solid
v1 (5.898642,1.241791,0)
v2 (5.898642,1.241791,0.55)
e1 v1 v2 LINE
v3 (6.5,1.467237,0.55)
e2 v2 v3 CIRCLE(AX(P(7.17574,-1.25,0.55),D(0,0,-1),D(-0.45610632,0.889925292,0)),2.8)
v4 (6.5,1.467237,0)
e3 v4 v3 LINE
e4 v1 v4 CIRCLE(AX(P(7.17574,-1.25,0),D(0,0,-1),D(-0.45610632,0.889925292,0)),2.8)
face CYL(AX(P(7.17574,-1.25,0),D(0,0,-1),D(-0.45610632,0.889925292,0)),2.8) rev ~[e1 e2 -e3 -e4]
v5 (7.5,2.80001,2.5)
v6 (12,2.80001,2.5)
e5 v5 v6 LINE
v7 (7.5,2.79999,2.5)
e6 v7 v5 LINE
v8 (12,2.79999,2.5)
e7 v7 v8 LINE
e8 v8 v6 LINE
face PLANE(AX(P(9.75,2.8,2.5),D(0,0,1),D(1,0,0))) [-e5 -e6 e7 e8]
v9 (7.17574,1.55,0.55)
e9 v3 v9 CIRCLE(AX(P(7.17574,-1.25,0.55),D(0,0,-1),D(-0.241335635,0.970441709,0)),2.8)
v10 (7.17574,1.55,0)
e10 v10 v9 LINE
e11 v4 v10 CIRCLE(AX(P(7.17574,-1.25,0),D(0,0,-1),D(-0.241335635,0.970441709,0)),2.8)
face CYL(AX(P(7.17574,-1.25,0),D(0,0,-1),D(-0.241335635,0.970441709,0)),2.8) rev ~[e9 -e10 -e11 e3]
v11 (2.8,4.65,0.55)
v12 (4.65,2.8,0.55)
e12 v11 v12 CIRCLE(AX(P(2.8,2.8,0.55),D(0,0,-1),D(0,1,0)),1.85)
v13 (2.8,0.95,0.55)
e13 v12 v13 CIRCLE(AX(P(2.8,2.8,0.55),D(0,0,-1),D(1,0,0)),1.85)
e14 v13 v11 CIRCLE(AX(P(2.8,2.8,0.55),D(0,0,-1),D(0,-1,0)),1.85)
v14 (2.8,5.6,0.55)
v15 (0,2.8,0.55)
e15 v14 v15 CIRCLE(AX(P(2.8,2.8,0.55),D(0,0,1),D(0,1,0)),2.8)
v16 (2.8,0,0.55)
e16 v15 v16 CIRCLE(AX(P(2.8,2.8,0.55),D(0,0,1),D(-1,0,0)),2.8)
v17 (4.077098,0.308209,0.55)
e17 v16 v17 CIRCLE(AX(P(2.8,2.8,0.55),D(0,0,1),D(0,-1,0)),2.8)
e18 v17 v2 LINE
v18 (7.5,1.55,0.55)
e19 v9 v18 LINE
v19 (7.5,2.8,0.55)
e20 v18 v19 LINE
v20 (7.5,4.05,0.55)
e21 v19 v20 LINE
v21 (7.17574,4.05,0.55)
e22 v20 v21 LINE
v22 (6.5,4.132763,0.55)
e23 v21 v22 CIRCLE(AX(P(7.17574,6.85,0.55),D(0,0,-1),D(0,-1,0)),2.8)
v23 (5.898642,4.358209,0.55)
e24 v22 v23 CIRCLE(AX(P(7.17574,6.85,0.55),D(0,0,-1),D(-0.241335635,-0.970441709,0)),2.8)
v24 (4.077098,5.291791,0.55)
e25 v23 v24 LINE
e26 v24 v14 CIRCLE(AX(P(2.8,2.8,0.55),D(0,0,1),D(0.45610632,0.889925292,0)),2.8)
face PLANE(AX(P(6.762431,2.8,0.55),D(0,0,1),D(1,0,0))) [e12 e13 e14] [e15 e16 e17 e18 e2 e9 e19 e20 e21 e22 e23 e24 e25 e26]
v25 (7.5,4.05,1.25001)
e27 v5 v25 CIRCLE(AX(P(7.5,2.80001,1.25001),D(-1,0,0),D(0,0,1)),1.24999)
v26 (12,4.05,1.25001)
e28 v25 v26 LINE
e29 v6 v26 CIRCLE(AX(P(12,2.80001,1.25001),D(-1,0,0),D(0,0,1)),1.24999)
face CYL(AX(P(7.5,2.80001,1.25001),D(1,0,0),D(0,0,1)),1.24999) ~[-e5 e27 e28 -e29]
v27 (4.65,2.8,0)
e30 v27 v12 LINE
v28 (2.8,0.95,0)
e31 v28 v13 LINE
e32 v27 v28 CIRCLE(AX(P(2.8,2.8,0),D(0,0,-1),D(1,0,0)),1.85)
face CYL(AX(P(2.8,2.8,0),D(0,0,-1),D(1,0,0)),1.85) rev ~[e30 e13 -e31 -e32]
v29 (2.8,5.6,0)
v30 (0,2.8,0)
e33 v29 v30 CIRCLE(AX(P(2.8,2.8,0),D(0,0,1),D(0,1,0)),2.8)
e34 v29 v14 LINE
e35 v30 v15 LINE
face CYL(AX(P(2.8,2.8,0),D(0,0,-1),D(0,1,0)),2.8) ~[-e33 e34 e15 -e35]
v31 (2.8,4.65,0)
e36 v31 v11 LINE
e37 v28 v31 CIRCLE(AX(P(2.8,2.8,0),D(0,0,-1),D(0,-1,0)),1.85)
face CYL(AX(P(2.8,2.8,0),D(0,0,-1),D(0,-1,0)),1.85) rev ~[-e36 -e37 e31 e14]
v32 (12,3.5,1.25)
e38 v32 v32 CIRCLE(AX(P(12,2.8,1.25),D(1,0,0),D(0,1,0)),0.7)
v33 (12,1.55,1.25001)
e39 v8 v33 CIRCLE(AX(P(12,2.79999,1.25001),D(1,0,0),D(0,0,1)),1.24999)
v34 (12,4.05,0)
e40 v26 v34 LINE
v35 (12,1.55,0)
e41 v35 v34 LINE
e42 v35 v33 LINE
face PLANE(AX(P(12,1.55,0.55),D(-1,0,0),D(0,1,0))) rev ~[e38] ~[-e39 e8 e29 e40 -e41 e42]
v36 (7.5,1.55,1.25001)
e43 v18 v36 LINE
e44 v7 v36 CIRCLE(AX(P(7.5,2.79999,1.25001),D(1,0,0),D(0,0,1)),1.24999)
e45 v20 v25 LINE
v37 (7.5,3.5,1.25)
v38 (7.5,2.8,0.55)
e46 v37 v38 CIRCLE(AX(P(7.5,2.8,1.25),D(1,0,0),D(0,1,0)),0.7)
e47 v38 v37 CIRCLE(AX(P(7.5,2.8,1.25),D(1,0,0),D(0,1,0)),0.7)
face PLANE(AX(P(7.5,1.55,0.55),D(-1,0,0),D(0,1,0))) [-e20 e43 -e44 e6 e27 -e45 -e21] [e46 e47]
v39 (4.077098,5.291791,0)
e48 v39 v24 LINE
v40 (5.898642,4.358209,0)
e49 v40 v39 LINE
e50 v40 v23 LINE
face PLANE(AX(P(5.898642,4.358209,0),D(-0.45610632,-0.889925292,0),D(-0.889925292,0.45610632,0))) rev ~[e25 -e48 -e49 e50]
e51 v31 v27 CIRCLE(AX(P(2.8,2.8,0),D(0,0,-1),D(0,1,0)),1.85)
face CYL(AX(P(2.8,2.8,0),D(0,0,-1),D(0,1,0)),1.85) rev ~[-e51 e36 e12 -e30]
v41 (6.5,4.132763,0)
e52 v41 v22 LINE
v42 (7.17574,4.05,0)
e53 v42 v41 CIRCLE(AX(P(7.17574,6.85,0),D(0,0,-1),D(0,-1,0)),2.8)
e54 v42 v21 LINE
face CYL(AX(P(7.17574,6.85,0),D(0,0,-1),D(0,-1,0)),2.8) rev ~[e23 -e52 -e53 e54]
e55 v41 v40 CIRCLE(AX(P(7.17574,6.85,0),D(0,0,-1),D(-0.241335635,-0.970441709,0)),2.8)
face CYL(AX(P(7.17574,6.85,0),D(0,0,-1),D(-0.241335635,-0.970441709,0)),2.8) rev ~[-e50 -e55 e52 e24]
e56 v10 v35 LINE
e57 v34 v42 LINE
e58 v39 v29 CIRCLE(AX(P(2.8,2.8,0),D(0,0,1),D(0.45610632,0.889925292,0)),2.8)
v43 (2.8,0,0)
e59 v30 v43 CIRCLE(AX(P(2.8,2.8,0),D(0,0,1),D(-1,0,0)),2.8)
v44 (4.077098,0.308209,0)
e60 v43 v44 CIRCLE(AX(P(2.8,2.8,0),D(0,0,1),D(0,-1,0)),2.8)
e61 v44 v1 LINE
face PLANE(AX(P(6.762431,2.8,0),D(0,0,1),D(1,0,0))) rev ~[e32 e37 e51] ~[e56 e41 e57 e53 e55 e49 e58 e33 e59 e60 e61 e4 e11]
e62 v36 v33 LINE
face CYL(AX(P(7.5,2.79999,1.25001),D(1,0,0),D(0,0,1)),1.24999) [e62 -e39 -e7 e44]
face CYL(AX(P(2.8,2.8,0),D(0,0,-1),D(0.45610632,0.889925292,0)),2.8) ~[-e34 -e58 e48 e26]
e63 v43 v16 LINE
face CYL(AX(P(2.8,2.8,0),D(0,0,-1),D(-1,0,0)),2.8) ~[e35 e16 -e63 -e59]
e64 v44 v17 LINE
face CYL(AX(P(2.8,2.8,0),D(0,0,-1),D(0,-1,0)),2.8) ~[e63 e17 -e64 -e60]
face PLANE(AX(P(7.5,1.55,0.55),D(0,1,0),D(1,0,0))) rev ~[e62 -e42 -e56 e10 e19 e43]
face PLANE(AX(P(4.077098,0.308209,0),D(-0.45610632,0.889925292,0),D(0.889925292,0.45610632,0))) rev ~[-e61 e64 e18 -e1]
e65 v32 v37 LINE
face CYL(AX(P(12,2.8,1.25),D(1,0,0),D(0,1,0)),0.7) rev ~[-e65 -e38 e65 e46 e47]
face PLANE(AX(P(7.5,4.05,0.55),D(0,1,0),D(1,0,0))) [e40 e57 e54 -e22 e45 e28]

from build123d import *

# Parameters (mm, degrees)
F1_DEPTH = 0.55
F2_W     = 4.5
F2_H     = 2.5
F3_DEPTH = 1.95
F4_R     = 1.24999
F5_R     = 0.7
F6_DEPTH = 25


# Not quite as in the source:
# - a fillet or chamfer is up to 0.001 mm smaller than in the source, because OpenCascade refuses the exact size


with BuildPart() as f1:
    # F0 (on Top) → F1 (new body)
    with BuildSketch(Plane.XY):
        with BuildLine():
            Line((7.1757397782, 1.55), (12, 1.55))
            Line((12, 1.55), (12, 4.05))
            Line((12, 4.05), (7.1757397782, 4.05))
            ThreePointArc((7.1757397782, 4.05), (6.8353451552, 4.0707678217), (6.5, 4.1327632138))
            ThreePointArc((6.5, 4.1327632138), (6.1928359056, 4.2281876541), (5.8986420809, 4.3582091838))
            Line((5.8986420809, 4.3582091838), (4.0770976972, 5.2917908162))
            ThreePointArc((4.0770976972, 5.2917908162), (3.4568811592, 5.5218572965), (2.8, 5.6))
            Line((2.8, 5.6), (2.8, 4.65))
            ThreePointArc((2.8, 4.65), (4.1081475452, 4.1081475452), (4.65, 2.8))
            ThreePointArc((4.65, 2.8), (4.1081475452, 1.4918524548), (2.8, 0.95))
            Line((2.8, 0.95), (2.8, 0))
            ThreePointArc((2.8, 0), (3.4568811592, 0.0781427035), (4.0770976972, 0.3082091838))
            Line((4.0770976972, 0.3082091838), (5.8986420809, 1.2417908162))
            ThreePointArc((5.8986420809, 1.2417908162), (6.1928359056, 1.3718123459), (6.5, 1.4672367862))
            ThreePointArc((6.5, 1.4672367862), (6.8353451552, 1.5292321783), (7.1757397782, 1.55))
        make_face()
        with BuildLine():
            ThreePointArc((0, 2.8), (0.8201010127, 0.8201010127), (2.8, 0))
            Line((2.8, 0), (2.8, 0.95))
            ThreePointArc((2.8, 0.95), (0.95, 2.8), (2.8, 4.65))
            Line((2.8, 4.65), (2.8, 5.6))
            ThreePointArc((2.8, 5.6), (0.8201010127, 4.7798989873), (0, 2.8))
        make_face()
    extrude(amount=F1_DEPTH)

    # F2 (on face) → F3 (join)
    with BuildSketch(Plane.XY.offset(0.55)):
        with Locations((9.75, 2.8)):
            Rectangle(F2_W, F2_H)
    extrude(amount=F3_DEPTH)

    # F4 (radius 1.25 in the source; OpenCascade refuses exactly that, so slightly less here)
    f4_edges = [f1.edges().sort_by_distance(p)[0] for p in [
        (9.75, 4.05, 2.5),
        (9.75, 1.55, 2.5),
    ]]
    fillet(f4_edges, radius=F4_R)

    # F5 (on face) → F6 (cut)
    with BuildSketch(Plane.YZ.offset(12)):
        with Locations((2.8, 1.25)):
            Circle(F5_R)
    extrude(amount=-F6_DEPTH, mode=Mode.SUBTRACT)


solid = f1.part
